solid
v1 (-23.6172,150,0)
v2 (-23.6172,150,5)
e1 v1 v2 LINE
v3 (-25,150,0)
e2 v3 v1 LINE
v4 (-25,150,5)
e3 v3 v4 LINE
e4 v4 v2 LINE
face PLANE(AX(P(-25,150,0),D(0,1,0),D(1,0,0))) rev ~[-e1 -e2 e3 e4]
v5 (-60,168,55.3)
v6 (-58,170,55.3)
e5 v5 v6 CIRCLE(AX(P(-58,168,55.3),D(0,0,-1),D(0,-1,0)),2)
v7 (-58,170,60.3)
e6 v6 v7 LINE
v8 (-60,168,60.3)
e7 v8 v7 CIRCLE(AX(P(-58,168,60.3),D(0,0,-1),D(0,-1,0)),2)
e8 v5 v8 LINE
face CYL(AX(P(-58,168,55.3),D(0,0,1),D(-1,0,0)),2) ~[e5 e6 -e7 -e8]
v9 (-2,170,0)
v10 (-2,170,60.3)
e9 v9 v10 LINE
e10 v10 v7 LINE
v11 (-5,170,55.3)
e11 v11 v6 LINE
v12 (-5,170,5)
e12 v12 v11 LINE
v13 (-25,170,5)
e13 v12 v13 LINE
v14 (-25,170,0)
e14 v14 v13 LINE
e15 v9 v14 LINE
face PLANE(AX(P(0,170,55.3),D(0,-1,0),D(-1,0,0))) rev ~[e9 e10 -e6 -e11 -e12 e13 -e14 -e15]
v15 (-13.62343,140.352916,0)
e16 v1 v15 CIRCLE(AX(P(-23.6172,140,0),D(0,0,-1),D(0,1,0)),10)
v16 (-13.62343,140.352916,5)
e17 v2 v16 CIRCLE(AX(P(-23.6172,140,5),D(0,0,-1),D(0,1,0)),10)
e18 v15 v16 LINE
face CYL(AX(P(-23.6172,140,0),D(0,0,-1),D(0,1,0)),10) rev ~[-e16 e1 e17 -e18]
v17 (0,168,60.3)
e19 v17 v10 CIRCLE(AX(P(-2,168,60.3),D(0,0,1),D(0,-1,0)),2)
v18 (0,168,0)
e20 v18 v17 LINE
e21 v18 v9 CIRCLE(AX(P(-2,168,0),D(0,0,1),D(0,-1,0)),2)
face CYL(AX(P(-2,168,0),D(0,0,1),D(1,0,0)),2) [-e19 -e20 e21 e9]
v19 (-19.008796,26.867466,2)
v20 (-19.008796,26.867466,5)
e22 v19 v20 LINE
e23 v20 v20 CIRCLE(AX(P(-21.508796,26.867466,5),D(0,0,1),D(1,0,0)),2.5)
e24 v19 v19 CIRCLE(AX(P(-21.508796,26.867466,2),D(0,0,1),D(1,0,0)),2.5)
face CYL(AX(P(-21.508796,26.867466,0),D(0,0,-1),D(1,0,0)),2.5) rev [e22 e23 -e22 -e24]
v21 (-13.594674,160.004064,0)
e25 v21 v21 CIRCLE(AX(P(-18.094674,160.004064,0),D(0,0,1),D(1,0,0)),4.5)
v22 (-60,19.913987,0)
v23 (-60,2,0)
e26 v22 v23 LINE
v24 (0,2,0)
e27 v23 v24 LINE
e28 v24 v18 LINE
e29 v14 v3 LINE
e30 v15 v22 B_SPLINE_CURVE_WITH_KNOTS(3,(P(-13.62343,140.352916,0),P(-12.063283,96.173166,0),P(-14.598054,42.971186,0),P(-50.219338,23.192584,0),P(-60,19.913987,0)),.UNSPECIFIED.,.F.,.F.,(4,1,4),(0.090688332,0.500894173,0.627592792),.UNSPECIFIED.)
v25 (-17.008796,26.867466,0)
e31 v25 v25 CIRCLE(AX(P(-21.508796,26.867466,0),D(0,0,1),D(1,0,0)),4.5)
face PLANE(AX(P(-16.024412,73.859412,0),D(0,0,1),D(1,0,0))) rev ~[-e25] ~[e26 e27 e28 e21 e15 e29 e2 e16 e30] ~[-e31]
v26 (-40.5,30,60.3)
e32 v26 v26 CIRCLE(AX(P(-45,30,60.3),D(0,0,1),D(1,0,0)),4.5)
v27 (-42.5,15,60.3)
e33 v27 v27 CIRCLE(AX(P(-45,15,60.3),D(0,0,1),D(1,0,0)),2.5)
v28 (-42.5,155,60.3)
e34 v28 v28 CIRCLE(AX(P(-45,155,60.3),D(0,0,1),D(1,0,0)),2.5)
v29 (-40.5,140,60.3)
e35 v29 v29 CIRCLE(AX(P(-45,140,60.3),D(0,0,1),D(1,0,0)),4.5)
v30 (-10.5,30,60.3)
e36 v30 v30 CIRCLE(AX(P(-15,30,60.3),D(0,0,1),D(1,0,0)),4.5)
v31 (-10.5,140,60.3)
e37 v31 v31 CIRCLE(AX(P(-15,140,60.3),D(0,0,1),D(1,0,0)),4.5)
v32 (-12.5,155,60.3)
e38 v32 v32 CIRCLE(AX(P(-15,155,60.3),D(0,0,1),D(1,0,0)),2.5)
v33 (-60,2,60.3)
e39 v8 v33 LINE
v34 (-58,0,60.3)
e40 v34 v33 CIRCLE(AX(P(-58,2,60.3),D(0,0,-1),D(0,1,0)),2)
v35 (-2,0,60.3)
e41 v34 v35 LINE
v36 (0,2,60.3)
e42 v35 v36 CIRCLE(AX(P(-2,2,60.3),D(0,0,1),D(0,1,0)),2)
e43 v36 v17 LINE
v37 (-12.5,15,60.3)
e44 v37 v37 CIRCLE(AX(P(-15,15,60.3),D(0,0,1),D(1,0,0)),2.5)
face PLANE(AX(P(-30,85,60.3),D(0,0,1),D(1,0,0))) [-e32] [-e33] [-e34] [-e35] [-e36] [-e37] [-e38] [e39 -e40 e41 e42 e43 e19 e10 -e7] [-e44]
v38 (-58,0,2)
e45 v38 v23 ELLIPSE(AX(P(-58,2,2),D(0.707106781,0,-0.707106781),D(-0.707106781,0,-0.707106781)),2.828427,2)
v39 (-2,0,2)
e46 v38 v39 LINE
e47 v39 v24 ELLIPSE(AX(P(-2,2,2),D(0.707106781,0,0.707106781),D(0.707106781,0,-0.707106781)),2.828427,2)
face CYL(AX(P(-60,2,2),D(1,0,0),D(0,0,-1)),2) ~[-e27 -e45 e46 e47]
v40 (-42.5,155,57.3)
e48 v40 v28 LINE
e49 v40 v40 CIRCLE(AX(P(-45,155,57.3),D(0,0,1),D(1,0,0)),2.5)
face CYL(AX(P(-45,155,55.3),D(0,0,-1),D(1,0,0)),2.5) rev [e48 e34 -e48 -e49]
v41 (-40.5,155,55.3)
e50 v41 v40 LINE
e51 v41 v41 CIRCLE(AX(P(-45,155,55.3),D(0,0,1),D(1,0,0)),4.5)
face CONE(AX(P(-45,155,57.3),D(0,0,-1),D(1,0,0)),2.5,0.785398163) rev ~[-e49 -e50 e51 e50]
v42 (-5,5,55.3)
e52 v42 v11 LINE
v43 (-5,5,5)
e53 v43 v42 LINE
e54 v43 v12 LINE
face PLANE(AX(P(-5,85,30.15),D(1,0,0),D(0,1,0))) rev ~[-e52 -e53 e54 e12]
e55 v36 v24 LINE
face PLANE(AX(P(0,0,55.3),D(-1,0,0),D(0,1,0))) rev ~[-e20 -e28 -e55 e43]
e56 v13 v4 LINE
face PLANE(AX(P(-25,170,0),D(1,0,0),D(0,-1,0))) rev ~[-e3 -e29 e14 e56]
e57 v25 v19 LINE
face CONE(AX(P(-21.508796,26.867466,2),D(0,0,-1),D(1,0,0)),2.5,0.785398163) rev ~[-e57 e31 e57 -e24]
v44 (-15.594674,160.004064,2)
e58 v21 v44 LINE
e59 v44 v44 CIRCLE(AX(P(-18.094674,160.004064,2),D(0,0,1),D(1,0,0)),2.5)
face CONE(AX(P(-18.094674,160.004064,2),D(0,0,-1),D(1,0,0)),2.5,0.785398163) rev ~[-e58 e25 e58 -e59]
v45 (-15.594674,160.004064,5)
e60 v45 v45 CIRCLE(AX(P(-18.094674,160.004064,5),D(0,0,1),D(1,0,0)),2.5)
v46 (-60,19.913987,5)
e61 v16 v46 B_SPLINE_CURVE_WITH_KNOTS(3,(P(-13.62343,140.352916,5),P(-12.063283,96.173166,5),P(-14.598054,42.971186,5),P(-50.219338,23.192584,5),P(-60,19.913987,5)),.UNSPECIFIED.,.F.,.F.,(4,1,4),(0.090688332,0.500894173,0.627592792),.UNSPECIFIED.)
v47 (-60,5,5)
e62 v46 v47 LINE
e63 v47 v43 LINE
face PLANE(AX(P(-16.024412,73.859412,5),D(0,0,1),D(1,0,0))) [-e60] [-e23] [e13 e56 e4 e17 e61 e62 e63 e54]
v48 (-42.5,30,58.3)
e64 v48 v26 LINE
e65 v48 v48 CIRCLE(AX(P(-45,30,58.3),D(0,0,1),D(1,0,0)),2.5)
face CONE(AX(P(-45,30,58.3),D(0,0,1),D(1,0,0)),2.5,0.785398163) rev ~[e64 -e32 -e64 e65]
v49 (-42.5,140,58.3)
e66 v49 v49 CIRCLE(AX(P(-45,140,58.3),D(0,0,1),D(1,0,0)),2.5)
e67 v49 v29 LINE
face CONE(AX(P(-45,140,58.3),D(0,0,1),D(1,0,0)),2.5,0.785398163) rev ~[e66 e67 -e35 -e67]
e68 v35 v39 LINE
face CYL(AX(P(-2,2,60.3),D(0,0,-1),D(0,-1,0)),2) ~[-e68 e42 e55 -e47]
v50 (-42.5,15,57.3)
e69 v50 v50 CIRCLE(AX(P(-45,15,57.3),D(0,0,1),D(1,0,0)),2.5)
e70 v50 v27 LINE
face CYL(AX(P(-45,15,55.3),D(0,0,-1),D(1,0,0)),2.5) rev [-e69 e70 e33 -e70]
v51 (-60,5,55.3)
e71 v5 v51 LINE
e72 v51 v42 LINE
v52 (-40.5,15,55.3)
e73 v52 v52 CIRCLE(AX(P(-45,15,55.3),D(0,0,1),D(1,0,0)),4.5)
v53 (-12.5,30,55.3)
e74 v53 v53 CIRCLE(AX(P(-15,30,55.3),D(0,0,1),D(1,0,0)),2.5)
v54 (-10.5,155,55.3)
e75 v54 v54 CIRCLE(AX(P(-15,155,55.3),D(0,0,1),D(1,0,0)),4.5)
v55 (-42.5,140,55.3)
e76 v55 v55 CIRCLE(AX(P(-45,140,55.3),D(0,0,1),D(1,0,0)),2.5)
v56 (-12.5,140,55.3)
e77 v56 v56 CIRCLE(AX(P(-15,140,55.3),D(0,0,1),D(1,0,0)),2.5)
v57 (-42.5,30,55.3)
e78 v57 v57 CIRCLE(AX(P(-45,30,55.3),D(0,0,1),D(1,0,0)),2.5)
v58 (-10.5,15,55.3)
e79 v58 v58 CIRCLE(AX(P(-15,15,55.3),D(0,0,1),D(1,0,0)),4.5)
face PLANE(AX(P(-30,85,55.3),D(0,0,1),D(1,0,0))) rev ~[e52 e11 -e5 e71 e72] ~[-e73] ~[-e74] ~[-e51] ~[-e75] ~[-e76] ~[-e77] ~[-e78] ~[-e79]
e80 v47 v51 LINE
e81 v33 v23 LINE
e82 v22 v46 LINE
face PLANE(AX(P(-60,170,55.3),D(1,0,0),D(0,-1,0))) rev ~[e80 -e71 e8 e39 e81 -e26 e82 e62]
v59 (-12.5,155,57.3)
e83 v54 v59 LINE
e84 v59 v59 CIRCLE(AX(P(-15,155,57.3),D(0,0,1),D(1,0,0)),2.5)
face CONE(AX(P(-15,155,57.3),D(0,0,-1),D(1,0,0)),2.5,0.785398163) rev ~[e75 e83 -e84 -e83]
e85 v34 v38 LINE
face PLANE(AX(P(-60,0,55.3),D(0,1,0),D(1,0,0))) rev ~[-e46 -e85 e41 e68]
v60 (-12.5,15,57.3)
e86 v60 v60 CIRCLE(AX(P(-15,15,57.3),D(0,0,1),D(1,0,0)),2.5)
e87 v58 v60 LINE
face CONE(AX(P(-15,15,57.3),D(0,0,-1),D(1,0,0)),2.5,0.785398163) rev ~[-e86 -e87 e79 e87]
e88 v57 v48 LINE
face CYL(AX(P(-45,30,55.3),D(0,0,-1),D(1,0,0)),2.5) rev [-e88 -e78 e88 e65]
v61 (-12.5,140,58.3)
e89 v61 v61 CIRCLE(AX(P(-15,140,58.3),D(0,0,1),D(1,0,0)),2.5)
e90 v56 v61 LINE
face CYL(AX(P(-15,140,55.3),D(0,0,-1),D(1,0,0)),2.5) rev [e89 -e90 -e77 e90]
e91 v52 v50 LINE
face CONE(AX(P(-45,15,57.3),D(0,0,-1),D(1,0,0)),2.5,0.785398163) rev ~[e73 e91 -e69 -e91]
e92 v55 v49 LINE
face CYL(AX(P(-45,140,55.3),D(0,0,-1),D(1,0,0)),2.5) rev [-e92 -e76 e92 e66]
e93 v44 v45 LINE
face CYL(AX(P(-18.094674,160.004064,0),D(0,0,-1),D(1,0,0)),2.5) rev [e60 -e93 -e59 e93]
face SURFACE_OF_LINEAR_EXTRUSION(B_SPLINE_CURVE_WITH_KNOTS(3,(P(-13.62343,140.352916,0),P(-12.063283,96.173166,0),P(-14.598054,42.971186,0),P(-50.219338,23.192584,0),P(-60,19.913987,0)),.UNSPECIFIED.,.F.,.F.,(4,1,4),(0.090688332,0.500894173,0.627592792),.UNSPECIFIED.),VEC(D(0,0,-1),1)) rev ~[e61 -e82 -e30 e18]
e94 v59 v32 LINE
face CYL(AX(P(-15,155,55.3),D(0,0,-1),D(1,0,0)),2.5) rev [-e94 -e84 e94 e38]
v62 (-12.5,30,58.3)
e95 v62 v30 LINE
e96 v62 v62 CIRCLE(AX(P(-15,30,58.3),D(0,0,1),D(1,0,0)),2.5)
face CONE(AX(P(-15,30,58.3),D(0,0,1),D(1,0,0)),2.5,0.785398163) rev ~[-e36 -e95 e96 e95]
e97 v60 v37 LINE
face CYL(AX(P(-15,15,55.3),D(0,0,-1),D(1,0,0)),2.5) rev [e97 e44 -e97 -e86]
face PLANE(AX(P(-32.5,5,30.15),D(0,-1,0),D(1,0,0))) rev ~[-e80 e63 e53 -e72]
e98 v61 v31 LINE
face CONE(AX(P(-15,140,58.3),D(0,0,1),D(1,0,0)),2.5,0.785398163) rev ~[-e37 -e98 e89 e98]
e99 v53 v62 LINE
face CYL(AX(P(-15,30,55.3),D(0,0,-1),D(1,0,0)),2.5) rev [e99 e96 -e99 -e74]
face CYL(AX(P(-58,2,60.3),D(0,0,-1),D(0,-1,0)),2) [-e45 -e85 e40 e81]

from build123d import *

# Parameters (mm, degrees)
F0_R     = 2.5
F1_DEPTH = 5
F2_W     = 170
F2_H     = 50.3
F3_DEPTH = 5
F4_W     = 55
F4_H     = 50.3
F5_DEPTH = 5
F7_R     = 2.5
F8_DEPTH = 5
F9_SIZE  = 2
F10_SIZE = 2
F11_SIZE = 2
F12_R    = 2


# Not quite as in the source:
# - a feature names something its author has since deleted; it is built from what else it names


with BuildPart() as f1:
    # F0 (on Top) → F1 (new body)
    with BuildSketch(Plane.XY):
        with BuildLine():
            Line((-60, 0), (0, 0))
            Line((0, 0), (0, 150))
            Line((0, 150), (0, 170))
            Line((0, 170), (-15, 170))
            add(Edge.make_bspline(
                [(-15, 170), (-14.4841735922, 160.0600889734), (-13.9683471845, 150.1201779469), (-13.6234299021, 140.3529161241)],
                knots=[0, 0, 0, 0, 0.0906883322, 0.0906883322, 0.0906883322, 0.0906883322], degree=3))
            add(Edge.make_bspline(
                [(-13.6234299021, 140.3529161241), (-12.0632834056, 96.1731661082), (-14.5980537911, 42.9711861088), (-50.2193379026, 23.1925838291), (-60, 19.9139873857)],
                knots=[0.0906883322, 0.0906883322, 0.0906883322, 0.0906883322, 0.5008941728, 0.6275927921, 0.6275927921, 0.6275927921, 0.6275927921], degree=3))
            Line((-60, 19.9139873857), (-60, 0))
        make_face()
        with Locations((-21.5087961406, 26.8674660474)):
            Circle(F0_R, mode=Mode.SUBTRACT)
        with BuildLine():
            ThreePointArc((-23.6172004723, 150), (-16.6720280929, 147.1947606368), (-13.6234299021, 140.3529161241))
            add(Edge.make_bspline(
                [(-15, 170), (-14.4841735922, 160.0600889734), (-13.9683471845, 150.1201779469), (-13.6234299021, 140.3529161241)],
                knots=[0, 0, 0, 0, 0.0906883322, 0.0906883322, 0.0906883322, 0.0906883322], degree=3))
            Line((-15, 170), (-25, 170))
            Line((-25, 170), (-25, 150))
            Line((-25, 150), (-23.6172004723, 150))
        make_face()
        with Locations((-18.0946737528, 160.0040644407)):
            Circle(F0_R, mode=Mode.SUBTRACT)
    extrude(amount=F1_DEPTH)

    # F2 (on face) → F3 (join)
    with BuildSketch(Plane.YZ):
        with Locations((85, 30.15)):
            Rectangle(F2_W, F2_H)
    extrude(amount=-F3_DEPTH)

    # F4 (on face) → F5 (join)
    with BuildSketch(Plane.XZ):
        with Locations((-32.5, 30.15)):
            Rectangle(F4_W, F4_H)
    extrude(amount=-F5_DEPTH)

    # F7 (on face) → F8 (join)
    with BuildSketch(Plane.XY.offset(55.3)):
        Polygon((-15, 0), (0, 0), (0, 15), (0, 155), (0, 170), (-15, 170), (-45, 170), (-60, 170), (-60, 155), (-60, 15), (-60, 0), (-45, 0), align=None)
        with Locations((-45, 15)):
            Circle(F7_R, mode=Mode.SUBTRACT)
        with Locations((-45, 30)):
            Circle(F7_R, mode=Mode.SUBTRACT)
        with Locations((-15, 15)):
            Circle(F7_R, mode=Mode.SUBTRACT)
        with Locations((-15, 30)):
            Circle(F7_R, mode=Mode.SUBTRACT)
        with Locations((-45, 140)):
            Circle(F7_R, mode=Mode.SUBTRACT)
        with Locations((-45, 155)):
            Circle(F7_R, mode=Mode.SUBTRACT)
        with Locations((-15, 140)):
            Circle(F7_R, mode=Mode.SUBTRACT)
        with Locations((-15, 155)):
            Circle(F7_R, mode=Mode.SUBTRACT)
    extrude(amount=F8_DEPTH)

    # F9
    f9_edges = [f1.edges().sort_by_distance(p)[0] for p in [
        (-17.5, 140, 60.3),
        (-47.5, 140, 60.3),
        (-17.5, 30, 60.3),
        (-47.5, 30, 60.3),
    ]]
    chamfer(f9_edges, length=F9_SIZE)

    # F10
    f10_edges = [f1.edges().sort_by_distance(p)[0] for p in [
        (-47.5, 155, 55.3),
        (-17.5, 155, 55.3),
        (-47.5, 15, 55.3),
        (-17.5, 15, 55.3),
    ]]
    chamfer(f10_edges, length=F10_SIZE)

    # F11
    f11_edges = [f1.edges().sort_by_distance(p)[0] for p in [
        (-24.008796, 26.867466, 0),
        (-20.594674, 160.004064, 0),
    ]]
    chamfer(f11_edges, length=F11_SIZE)

    # F12
    f12_edges = [f1.edges().sort_by_distance(p)[0] for p in [
        (0, 0, 30.15),
        (-60, 0, 30.15),
        (-30, 0, 0),
        (0, 170, 30.15),
        (-60, 170, 57.8),
    ]]
    fillet(f12_edges, radius=F12_R)


solid = f1.part
